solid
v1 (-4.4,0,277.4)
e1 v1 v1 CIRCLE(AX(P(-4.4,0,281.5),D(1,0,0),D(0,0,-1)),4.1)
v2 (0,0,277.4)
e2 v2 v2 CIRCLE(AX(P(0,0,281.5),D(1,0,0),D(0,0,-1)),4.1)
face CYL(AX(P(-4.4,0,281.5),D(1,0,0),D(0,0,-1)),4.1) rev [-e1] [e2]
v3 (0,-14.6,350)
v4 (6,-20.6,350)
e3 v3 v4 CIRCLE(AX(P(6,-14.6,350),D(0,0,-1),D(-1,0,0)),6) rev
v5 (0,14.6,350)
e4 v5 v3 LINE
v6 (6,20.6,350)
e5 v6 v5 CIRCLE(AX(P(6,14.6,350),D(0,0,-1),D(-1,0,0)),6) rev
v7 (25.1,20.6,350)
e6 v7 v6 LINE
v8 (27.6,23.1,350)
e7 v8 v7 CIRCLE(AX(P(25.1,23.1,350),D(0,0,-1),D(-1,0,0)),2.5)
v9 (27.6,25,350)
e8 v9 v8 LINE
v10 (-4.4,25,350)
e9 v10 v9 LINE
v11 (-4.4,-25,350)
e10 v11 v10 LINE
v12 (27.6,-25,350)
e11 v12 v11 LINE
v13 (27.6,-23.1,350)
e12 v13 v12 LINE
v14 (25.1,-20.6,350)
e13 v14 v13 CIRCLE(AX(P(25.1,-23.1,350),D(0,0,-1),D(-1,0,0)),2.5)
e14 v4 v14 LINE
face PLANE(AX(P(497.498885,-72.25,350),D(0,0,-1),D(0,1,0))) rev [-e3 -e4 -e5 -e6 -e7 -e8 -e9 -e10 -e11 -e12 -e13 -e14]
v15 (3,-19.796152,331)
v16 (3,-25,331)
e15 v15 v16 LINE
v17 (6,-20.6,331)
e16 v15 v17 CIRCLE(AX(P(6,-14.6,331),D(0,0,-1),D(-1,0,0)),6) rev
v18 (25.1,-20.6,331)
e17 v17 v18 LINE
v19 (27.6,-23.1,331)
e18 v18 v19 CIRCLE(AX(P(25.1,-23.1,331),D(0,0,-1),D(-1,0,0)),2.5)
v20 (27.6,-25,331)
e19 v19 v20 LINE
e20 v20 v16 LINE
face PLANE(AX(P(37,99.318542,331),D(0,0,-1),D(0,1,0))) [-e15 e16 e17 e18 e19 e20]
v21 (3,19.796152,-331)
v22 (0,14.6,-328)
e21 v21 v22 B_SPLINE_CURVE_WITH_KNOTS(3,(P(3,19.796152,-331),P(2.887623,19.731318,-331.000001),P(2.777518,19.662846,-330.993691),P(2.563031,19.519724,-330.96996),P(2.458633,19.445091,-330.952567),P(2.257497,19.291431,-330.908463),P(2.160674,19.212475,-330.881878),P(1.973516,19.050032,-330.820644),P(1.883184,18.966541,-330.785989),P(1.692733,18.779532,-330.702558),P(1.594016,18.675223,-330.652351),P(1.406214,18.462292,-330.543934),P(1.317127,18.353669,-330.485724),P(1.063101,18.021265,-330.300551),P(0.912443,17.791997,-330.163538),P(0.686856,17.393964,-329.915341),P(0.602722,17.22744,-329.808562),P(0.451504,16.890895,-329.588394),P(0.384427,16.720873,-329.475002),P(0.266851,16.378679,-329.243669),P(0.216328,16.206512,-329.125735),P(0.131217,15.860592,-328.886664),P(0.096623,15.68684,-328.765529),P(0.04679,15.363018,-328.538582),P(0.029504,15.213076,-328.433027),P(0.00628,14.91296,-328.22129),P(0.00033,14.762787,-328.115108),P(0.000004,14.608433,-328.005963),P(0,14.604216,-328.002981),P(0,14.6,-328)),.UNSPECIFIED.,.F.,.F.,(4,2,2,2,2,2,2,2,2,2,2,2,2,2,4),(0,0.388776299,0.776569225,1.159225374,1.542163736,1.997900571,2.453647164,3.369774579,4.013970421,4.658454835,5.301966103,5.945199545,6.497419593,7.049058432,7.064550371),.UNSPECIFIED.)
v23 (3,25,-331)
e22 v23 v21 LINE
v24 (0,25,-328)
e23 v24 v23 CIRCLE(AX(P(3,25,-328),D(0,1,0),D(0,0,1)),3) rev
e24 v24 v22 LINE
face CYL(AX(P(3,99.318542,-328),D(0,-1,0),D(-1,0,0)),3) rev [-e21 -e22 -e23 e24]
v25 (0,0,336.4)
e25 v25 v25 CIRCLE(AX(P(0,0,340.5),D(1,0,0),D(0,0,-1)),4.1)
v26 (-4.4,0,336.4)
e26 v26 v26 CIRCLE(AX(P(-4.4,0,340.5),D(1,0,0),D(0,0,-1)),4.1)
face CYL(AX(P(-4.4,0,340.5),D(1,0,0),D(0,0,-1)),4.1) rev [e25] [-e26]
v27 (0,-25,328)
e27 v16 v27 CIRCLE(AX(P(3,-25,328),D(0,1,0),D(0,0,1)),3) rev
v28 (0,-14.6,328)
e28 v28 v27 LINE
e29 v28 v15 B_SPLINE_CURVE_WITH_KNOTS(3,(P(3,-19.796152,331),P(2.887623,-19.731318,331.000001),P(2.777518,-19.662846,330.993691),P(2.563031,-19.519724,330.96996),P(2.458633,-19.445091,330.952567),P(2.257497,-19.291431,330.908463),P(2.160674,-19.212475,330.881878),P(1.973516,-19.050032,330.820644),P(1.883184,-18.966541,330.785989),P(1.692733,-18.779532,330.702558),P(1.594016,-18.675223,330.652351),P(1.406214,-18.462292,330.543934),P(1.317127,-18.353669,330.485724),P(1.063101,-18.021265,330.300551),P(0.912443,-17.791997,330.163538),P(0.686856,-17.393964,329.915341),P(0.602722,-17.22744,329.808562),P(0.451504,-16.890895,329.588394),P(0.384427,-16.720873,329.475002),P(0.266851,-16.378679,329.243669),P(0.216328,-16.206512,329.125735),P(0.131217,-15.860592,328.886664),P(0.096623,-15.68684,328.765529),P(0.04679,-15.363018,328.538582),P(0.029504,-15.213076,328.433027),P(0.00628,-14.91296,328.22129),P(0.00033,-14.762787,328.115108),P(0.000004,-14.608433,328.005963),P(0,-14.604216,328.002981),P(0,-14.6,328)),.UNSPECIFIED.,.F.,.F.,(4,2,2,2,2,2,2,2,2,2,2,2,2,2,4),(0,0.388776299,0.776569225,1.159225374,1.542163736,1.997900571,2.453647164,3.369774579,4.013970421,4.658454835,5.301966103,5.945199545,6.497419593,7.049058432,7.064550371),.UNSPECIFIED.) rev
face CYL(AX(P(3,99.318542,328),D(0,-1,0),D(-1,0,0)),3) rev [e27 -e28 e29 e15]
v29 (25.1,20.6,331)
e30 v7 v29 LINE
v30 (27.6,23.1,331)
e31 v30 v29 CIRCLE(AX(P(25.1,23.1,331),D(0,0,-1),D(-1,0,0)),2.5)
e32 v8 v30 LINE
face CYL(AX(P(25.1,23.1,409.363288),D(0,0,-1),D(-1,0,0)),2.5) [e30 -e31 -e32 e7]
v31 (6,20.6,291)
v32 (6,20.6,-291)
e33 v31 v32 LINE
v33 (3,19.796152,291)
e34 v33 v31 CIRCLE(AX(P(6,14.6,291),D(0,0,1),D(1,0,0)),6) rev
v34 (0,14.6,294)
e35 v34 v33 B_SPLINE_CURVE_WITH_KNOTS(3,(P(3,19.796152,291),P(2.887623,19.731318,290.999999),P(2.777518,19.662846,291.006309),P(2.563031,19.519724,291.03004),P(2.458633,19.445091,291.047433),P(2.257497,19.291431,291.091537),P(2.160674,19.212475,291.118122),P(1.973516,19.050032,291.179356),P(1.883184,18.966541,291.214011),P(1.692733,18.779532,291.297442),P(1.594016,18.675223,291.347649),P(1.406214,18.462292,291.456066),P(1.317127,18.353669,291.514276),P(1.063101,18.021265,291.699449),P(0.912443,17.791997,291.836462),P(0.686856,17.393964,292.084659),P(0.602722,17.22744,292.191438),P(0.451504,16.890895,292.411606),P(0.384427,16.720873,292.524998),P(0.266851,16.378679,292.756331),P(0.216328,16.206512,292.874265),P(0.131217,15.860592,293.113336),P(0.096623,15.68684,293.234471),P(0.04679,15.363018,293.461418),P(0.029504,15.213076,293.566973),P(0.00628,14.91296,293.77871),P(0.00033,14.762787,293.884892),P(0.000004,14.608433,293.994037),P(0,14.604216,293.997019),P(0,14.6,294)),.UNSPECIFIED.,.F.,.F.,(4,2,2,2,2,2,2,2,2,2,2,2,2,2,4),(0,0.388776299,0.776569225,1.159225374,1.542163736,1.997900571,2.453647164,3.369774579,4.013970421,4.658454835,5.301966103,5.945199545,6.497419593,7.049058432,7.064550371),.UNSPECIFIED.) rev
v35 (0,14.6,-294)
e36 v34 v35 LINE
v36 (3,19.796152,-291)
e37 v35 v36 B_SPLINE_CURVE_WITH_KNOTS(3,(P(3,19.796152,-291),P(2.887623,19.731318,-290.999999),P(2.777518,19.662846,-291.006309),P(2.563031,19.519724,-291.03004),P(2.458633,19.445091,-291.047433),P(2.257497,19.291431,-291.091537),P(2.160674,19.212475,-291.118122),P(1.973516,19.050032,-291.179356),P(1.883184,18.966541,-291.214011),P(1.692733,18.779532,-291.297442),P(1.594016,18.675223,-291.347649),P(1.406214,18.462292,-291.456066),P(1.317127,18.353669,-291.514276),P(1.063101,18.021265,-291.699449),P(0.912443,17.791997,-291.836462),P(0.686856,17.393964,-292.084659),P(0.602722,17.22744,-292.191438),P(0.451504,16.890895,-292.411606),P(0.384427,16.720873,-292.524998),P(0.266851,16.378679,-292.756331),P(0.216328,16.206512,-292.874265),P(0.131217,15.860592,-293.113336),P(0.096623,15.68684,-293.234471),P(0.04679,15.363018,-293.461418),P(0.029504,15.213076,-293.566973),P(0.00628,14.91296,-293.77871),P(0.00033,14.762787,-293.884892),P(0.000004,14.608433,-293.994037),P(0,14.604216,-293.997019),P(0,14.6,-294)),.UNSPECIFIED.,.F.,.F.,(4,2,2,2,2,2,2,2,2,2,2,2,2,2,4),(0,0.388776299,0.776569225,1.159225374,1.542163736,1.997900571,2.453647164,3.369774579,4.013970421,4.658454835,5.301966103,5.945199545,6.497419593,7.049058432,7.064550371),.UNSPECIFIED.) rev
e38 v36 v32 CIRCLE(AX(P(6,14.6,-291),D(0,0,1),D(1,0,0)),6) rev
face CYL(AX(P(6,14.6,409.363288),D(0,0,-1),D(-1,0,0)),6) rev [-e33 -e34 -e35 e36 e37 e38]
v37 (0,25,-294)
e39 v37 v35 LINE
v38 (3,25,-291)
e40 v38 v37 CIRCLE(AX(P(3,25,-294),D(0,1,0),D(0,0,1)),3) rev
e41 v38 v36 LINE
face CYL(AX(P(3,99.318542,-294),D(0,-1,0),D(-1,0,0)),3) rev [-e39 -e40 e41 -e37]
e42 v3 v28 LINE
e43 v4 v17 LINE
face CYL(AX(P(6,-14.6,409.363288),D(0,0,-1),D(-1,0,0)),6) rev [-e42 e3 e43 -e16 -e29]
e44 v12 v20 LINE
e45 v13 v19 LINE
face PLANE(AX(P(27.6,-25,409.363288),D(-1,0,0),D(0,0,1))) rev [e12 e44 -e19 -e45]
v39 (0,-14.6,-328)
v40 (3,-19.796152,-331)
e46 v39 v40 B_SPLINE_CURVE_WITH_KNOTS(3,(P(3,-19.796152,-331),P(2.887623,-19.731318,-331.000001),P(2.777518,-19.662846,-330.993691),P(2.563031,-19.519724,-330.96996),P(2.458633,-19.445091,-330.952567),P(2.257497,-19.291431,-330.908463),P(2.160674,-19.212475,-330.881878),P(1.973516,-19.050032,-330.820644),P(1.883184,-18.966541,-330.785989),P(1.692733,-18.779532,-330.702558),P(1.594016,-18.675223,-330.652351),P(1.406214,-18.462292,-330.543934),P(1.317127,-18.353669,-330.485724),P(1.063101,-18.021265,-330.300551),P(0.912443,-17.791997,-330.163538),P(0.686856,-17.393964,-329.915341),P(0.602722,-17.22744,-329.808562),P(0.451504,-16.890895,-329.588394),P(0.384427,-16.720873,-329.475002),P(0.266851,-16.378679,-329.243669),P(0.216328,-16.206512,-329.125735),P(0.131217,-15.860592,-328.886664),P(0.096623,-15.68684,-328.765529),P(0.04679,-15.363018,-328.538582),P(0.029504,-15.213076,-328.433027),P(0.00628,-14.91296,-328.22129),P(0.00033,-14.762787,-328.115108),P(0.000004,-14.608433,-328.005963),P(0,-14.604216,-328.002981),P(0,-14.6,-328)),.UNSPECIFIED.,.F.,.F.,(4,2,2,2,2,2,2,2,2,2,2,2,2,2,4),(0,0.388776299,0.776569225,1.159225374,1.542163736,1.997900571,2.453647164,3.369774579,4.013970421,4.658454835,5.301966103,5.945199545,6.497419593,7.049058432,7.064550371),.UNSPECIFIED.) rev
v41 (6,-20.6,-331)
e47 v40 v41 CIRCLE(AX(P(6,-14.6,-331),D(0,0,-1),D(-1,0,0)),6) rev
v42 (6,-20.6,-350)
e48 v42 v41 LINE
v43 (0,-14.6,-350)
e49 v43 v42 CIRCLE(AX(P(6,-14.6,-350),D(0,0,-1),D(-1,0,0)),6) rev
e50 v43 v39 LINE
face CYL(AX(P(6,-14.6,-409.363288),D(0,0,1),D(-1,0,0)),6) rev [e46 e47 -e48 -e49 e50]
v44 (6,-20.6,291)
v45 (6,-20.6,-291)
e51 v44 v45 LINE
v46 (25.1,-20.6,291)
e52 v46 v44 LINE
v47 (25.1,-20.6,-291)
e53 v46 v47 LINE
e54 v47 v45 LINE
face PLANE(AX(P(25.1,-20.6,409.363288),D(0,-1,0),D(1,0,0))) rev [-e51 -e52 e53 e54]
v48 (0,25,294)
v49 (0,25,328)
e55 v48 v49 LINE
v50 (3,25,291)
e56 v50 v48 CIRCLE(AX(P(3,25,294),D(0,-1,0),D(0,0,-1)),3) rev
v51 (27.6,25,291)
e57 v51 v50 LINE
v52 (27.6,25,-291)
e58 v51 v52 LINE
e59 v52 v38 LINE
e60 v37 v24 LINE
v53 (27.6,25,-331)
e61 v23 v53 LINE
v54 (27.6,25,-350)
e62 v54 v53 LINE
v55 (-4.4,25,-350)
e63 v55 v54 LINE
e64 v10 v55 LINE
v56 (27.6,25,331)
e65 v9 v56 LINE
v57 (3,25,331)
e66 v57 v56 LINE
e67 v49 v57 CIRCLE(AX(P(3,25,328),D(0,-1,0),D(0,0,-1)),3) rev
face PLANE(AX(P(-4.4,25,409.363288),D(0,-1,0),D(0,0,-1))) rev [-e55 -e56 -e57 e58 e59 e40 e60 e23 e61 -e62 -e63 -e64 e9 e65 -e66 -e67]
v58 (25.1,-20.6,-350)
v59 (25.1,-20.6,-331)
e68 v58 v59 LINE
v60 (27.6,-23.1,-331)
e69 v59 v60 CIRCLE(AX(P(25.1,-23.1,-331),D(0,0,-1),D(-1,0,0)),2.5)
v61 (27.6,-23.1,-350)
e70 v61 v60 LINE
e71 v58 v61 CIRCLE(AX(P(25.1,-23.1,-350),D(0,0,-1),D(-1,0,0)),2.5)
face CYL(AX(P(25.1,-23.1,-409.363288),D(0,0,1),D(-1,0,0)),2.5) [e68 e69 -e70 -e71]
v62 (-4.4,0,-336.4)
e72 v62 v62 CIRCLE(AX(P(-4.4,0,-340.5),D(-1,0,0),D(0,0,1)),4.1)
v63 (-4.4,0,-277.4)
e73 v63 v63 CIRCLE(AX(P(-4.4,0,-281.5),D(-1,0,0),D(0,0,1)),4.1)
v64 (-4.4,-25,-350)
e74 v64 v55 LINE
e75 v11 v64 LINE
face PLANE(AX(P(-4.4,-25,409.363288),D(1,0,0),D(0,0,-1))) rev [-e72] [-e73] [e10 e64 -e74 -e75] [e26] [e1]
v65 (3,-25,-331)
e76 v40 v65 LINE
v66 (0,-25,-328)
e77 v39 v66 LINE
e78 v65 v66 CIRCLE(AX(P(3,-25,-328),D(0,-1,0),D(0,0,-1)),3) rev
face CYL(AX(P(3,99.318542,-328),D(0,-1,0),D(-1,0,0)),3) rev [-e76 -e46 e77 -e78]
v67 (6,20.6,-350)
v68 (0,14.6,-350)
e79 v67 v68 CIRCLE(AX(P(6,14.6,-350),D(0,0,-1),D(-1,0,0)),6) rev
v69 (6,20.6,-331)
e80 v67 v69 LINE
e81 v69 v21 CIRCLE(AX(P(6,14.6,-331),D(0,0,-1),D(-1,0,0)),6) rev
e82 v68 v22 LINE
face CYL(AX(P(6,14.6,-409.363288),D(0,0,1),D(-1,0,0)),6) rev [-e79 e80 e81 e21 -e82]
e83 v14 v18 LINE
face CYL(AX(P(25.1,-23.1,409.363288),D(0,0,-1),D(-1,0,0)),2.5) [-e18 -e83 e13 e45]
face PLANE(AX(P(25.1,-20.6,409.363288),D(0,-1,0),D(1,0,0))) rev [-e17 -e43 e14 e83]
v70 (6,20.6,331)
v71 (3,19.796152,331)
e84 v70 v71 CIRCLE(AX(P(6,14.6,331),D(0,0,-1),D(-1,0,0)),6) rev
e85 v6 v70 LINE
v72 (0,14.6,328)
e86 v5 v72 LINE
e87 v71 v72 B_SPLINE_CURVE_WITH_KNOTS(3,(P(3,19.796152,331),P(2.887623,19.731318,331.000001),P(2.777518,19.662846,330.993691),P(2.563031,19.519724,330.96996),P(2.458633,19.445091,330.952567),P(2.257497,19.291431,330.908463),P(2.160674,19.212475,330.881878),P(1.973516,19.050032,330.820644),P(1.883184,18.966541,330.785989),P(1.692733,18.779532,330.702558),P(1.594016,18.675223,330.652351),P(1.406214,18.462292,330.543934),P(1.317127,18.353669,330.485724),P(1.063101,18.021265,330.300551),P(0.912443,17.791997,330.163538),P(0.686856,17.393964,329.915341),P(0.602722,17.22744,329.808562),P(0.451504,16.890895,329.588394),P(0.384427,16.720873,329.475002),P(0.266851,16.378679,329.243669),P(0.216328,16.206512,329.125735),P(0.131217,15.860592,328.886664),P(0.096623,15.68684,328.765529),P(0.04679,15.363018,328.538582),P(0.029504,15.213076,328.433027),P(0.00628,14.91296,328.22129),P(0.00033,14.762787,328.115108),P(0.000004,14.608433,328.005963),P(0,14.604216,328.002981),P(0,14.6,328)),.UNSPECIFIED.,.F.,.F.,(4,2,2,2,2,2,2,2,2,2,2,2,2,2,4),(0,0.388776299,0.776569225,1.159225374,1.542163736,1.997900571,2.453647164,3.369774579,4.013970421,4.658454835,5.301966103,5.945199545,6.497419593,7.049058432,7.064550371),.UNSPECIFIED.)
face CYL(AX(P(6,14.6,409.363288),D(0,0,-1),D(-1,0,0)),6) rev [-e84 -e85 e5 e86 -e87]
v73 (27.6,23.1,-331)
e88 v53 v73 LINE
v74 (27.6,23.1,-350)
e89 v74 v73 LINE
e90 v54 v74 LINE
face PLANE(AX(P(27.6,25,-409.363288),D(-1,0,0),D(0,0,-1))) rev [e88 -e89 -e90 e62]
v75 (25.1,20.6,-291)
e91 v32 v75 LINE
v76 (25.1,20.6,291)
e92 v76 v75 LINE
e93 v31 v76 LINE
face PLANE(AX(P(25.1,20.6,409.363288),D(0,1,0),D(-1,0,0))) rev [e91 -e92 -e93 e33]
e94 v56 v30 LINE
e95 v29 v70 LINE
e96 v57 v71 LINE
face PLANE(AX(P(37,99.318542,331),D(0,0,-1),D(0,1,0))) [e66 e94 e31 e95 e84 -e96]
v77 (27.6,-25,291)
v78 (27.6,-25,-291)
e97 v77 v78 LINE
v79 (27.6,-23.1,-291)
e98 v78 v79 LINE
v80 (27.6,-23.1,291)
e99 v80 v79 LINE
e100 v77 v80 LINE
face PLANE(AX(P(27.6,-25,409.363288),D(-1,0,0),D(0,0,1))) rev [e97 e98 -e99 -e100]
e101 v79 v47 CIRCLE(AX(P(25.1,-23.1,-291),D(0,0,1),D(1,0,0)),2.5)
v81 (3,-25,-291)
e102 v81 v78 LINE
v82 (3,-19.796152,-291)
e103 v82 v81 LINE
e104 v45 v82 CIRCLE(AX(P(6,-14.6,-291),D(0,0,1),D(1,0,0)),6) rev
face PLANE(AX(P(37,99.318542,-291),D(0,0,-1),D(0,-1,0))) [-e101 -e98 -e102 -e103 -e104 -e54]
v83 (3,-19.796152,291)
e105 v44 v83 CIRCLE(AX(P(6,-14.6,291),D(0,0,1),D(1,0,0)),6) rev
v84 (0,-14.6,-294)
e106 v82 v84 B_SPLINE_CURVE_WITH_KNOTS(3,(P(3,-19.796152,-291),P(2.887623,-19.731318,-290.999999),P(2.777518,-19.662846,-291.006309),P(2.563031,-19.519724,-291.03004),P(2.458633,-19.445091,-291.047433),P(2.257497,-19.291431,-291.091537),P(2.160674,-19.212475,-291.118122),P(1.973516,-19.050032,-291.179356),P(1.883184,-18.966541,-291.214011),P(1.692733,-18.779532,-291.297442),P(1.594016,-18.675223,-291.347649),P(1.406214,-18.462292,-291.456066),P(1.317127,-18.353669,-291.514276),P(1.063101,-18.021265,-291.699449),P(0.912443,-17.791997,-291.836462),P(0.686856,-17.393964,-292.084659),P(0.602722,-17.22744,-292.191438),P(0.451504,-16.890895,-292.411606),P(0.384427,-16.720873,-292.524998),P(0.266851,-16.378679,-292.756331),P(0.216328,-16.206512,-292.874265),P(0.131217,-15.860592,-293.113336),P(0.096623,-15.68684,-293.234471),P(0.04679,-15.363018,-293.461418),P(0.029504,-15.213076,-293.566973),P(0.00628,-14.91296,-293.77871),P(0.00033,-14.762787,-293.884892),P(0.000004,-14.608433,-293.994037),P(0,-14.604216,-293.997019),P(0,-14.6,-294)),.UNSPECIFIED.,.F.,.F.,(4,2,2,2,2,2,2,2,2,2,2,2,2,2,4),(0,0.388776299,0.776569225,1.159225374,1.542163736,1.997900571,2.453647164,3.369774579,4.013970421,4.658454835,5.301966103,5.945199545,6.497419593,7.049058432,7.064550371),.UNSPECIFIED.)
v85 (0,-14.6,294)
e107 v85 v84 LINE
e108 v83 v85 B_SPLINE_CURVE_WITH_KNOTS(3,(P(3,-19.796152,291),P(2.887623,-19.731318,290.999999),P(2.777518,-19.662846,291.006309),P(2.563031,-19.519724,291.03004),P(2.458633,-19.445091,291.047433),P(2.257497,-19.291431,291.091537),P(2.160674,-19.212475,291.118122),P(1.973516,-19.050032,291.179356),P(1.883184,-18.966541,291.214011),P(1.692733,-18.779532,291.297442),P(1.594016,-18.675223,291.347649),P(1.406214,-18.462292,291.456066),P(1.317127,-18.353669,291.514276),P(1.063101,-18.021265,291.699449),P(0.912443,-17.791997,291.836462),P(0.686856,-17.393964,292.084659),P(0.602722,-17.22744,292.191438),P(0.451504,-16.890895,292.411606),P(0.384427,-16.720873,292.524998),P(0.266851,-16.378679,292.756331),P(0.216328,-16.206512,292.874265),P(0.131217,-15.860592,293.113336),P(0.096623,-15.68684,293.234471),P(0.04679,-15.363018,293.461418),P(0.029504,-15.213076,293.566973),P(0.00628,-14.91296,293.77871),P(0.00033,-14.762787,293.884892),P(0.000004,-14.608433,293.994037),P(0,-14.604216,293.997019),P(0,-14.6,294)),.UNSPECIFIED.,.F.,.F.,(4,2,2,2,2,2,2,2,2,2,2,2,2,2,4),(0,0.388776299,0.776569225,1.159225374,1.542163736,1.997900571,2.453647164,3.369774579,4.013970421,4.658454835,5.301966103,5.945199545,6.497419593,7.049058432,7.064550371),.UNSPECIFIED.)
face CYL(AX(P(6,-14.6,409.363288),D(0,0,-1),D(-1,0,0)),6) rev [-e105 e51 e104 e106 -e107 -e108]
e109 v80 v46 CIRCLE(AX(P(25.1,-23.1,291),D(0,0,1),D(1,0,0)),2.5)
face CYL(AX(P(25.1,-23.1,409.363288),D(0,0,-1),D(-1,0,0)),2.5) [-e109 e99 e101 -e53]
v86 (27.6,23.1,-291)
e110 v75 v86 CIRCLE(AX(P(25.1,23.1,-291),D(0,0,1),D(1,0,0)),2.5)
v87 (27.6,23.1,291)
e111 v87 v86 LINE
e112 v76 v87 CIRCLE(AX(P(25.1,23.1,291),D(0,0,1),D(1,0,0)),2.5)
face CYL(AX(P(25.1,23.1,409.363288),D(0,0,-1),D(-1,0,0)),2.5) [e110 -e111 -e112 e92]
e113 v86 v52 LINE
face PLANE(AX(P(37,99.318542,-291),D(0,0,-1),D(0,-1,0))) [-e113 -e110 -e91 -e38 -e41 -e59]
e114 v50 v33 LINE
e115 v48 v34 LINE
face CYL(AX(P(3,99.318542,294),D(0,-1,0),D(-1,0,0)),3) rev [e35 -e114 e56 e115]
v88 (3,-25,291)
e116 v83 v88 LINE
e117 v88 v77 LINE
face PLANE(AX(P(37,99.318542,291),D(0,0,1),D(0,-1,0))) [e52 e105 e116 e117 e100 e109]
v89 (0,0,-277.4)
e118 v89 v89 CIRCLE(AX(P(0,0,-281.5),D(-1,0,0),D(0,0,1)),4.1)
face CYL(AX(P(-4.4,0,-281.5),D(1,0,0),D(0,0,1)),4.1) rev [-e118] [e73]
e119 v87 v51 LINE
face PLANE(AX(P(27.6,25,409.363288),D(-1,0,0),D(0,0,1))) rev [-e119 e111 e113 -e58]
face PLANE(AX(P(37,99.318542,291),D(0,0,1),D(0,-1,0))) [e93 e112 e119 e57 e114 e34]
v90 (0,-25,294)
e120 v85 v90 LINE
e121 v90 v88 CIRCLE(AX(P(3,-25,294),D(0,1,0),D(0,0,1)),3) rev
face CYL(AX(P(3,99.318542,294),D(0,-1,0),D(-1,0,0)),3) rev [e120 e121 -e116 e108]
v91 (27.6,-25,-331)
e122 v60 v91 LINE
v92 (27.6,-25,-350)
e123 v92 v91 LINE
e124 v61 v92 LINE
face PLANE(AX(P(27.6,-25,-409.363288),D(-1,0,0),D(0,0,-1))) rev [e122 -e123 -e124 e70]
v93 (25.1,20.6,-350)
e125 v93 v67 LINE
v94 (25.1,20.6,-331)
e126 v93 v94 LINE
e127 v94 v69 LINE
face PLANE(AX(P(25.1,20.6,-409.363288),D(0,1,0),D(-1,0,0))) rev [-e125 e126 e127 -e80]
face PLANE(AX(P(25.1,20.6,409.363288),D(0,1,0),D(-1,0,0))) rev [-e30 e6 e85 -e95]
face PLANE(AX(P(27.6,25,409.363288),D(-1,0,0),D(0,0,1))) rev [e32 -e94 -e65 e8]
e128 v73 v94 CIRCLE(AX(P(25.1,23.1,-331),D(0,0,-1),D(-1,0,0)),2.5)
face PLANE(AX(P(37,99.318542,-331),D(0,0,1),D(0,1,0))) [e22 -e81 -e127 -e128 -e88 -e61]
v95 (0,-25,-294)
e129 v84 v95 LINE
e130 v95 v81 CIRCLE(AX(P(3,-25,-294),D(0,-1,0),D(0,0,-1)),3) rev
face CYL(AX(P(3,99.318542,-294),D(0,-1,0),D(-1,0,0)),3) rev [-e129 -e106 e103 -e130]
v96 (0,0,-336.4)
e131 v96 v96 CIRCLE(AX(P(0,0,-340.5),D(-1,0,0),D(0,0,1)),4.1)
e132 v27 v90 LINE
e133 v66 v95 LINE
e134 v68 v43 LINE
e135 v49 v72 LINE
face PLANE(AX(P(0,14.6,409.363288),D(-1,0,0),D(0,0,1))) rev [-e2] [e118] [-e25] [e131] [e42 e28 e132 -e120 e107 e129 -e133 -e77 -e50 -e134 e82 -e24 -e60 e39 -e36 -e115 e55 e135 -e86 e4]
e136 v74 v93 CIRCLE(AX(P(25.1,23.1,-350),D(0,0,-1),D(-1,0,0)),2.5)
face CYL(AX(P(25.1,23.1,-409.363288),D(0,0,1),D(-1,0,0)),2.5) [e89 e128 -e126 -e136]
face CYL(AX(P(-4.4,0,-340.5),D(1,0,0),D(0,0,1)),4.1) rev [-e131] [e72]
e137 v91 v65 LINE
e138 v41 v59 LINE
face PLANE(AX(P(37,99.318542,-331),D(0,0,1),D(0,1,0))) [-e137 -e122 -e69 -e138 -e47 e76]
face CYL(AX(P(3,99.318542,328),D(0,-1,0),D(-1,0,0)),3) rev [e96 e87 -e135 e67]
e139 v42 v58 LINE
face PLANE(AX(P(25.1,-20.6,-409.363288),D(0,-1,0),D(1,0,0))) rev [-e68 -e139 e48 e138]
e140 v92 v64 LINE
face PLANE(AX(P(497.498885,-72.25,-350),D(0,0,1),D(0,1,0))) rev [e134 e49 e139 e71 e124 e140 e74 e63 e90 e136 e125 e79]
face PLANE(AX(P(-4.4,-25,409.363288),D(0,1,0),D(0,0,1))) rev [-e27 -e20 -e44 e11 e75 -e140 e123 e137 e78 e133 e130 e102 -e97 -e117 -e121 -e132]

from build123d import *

# Parameters (mm, degrees)
EXTRUDE_1_DEPTH     = 350
OTHER_START         = -25
OTHER_1_DEPTH       = 50
SKETCH_4_R          = 4.1
CUT_EXTRUDE_1_DEPTH = 352.975510618


# Read off the part's stored shape, not the designer's step: Полость1
with BuildPart() as part:
    # Эскиз1 → Бобышка-Вытянуть1 (new body)
    with BuildSketch(Plane.XY):
        with BuildLine():
            Line((-4.4, -25), (-4.4, 25))
            Line((-4.4, 25), (27.6, 25))
            Line((27.6, 25), (27.6, 23.1))
            ThreePointArc((27.6, 23.1), (26.867766953, 21.332233047), (25.1, 20.6))
            Line((25.1, 20.6), (6, 20.6))
            ThreePointArc((6, 20.6), (1.757359313, 18.842640687), (0, 14.6))
            Line((0, 14.6), (0, -14.6))
            ThreePointArc((0, -14.6), (1.757359313, -18.842640687), (6, -20.6))
            Line((6, -20.6), (25.1, -20.6))
            ThreePointArc((25.1, -20.6), (26.867766953, -21.332233047), (27.6, -23.1))
            Line((27.6, -23.1), (27.6, -25))
            Line((27.6, -25), (-4.4, -25))
        make_face()
    extrude(amount=EXTRUDE_1_DEPTH)

    # Полость1 outline → Полость1 (cut)
    with BuildSketch(Plane(origin=(0, 0, 0), x_dir=(1, 0, 0), z_dir=(0, 1, 0)).offset(OTHER_START)):
        with BuildLine():
            ThreePointArc((3, -291), (0.878679656, -291.878679656), (0, -294))
            Line((0, -294), (0, -328))
            ThreePointArc((0, -328), (0.878679656, -330.121320344), (3, -331))
            Line((3, -331), (27.6, -331))
            Line((27.6, -331), (27.6, -291))
            Line((27.6, -291), (3, -291))
        make_face()
    extrude(amount=OTHER_1_DEPTH, mode=Mode.SUBTRACT)

    # Эскиз4 → Вырез-Вытянуть1 (cut, through all)
    with BuildSketch(Plane(origin=(0, 0, 0), x_dir=(0, 0, -1), z_dir=(1, 0, 0))):
        with Locations((-340.5, 0)):
            Circle(SKETCH_4_R)
        with Locations((-281.5, 0)):
            Circle(SKETCH_4_R)
    extrude(amount=-CUT_EXTRUDE_1_DEPTH, mode=Mode.SUBTRACT)

    # Зеркальное отражение1: part across plane


with BuildPart() as part_1:
    add(part.part)
    add(part.part.mirror(Plane(origin=(25.1, 23.1, 0), x_dir=(1, 0, 0), z_dir=(0, 0, -1))))


solid = part_1.part
